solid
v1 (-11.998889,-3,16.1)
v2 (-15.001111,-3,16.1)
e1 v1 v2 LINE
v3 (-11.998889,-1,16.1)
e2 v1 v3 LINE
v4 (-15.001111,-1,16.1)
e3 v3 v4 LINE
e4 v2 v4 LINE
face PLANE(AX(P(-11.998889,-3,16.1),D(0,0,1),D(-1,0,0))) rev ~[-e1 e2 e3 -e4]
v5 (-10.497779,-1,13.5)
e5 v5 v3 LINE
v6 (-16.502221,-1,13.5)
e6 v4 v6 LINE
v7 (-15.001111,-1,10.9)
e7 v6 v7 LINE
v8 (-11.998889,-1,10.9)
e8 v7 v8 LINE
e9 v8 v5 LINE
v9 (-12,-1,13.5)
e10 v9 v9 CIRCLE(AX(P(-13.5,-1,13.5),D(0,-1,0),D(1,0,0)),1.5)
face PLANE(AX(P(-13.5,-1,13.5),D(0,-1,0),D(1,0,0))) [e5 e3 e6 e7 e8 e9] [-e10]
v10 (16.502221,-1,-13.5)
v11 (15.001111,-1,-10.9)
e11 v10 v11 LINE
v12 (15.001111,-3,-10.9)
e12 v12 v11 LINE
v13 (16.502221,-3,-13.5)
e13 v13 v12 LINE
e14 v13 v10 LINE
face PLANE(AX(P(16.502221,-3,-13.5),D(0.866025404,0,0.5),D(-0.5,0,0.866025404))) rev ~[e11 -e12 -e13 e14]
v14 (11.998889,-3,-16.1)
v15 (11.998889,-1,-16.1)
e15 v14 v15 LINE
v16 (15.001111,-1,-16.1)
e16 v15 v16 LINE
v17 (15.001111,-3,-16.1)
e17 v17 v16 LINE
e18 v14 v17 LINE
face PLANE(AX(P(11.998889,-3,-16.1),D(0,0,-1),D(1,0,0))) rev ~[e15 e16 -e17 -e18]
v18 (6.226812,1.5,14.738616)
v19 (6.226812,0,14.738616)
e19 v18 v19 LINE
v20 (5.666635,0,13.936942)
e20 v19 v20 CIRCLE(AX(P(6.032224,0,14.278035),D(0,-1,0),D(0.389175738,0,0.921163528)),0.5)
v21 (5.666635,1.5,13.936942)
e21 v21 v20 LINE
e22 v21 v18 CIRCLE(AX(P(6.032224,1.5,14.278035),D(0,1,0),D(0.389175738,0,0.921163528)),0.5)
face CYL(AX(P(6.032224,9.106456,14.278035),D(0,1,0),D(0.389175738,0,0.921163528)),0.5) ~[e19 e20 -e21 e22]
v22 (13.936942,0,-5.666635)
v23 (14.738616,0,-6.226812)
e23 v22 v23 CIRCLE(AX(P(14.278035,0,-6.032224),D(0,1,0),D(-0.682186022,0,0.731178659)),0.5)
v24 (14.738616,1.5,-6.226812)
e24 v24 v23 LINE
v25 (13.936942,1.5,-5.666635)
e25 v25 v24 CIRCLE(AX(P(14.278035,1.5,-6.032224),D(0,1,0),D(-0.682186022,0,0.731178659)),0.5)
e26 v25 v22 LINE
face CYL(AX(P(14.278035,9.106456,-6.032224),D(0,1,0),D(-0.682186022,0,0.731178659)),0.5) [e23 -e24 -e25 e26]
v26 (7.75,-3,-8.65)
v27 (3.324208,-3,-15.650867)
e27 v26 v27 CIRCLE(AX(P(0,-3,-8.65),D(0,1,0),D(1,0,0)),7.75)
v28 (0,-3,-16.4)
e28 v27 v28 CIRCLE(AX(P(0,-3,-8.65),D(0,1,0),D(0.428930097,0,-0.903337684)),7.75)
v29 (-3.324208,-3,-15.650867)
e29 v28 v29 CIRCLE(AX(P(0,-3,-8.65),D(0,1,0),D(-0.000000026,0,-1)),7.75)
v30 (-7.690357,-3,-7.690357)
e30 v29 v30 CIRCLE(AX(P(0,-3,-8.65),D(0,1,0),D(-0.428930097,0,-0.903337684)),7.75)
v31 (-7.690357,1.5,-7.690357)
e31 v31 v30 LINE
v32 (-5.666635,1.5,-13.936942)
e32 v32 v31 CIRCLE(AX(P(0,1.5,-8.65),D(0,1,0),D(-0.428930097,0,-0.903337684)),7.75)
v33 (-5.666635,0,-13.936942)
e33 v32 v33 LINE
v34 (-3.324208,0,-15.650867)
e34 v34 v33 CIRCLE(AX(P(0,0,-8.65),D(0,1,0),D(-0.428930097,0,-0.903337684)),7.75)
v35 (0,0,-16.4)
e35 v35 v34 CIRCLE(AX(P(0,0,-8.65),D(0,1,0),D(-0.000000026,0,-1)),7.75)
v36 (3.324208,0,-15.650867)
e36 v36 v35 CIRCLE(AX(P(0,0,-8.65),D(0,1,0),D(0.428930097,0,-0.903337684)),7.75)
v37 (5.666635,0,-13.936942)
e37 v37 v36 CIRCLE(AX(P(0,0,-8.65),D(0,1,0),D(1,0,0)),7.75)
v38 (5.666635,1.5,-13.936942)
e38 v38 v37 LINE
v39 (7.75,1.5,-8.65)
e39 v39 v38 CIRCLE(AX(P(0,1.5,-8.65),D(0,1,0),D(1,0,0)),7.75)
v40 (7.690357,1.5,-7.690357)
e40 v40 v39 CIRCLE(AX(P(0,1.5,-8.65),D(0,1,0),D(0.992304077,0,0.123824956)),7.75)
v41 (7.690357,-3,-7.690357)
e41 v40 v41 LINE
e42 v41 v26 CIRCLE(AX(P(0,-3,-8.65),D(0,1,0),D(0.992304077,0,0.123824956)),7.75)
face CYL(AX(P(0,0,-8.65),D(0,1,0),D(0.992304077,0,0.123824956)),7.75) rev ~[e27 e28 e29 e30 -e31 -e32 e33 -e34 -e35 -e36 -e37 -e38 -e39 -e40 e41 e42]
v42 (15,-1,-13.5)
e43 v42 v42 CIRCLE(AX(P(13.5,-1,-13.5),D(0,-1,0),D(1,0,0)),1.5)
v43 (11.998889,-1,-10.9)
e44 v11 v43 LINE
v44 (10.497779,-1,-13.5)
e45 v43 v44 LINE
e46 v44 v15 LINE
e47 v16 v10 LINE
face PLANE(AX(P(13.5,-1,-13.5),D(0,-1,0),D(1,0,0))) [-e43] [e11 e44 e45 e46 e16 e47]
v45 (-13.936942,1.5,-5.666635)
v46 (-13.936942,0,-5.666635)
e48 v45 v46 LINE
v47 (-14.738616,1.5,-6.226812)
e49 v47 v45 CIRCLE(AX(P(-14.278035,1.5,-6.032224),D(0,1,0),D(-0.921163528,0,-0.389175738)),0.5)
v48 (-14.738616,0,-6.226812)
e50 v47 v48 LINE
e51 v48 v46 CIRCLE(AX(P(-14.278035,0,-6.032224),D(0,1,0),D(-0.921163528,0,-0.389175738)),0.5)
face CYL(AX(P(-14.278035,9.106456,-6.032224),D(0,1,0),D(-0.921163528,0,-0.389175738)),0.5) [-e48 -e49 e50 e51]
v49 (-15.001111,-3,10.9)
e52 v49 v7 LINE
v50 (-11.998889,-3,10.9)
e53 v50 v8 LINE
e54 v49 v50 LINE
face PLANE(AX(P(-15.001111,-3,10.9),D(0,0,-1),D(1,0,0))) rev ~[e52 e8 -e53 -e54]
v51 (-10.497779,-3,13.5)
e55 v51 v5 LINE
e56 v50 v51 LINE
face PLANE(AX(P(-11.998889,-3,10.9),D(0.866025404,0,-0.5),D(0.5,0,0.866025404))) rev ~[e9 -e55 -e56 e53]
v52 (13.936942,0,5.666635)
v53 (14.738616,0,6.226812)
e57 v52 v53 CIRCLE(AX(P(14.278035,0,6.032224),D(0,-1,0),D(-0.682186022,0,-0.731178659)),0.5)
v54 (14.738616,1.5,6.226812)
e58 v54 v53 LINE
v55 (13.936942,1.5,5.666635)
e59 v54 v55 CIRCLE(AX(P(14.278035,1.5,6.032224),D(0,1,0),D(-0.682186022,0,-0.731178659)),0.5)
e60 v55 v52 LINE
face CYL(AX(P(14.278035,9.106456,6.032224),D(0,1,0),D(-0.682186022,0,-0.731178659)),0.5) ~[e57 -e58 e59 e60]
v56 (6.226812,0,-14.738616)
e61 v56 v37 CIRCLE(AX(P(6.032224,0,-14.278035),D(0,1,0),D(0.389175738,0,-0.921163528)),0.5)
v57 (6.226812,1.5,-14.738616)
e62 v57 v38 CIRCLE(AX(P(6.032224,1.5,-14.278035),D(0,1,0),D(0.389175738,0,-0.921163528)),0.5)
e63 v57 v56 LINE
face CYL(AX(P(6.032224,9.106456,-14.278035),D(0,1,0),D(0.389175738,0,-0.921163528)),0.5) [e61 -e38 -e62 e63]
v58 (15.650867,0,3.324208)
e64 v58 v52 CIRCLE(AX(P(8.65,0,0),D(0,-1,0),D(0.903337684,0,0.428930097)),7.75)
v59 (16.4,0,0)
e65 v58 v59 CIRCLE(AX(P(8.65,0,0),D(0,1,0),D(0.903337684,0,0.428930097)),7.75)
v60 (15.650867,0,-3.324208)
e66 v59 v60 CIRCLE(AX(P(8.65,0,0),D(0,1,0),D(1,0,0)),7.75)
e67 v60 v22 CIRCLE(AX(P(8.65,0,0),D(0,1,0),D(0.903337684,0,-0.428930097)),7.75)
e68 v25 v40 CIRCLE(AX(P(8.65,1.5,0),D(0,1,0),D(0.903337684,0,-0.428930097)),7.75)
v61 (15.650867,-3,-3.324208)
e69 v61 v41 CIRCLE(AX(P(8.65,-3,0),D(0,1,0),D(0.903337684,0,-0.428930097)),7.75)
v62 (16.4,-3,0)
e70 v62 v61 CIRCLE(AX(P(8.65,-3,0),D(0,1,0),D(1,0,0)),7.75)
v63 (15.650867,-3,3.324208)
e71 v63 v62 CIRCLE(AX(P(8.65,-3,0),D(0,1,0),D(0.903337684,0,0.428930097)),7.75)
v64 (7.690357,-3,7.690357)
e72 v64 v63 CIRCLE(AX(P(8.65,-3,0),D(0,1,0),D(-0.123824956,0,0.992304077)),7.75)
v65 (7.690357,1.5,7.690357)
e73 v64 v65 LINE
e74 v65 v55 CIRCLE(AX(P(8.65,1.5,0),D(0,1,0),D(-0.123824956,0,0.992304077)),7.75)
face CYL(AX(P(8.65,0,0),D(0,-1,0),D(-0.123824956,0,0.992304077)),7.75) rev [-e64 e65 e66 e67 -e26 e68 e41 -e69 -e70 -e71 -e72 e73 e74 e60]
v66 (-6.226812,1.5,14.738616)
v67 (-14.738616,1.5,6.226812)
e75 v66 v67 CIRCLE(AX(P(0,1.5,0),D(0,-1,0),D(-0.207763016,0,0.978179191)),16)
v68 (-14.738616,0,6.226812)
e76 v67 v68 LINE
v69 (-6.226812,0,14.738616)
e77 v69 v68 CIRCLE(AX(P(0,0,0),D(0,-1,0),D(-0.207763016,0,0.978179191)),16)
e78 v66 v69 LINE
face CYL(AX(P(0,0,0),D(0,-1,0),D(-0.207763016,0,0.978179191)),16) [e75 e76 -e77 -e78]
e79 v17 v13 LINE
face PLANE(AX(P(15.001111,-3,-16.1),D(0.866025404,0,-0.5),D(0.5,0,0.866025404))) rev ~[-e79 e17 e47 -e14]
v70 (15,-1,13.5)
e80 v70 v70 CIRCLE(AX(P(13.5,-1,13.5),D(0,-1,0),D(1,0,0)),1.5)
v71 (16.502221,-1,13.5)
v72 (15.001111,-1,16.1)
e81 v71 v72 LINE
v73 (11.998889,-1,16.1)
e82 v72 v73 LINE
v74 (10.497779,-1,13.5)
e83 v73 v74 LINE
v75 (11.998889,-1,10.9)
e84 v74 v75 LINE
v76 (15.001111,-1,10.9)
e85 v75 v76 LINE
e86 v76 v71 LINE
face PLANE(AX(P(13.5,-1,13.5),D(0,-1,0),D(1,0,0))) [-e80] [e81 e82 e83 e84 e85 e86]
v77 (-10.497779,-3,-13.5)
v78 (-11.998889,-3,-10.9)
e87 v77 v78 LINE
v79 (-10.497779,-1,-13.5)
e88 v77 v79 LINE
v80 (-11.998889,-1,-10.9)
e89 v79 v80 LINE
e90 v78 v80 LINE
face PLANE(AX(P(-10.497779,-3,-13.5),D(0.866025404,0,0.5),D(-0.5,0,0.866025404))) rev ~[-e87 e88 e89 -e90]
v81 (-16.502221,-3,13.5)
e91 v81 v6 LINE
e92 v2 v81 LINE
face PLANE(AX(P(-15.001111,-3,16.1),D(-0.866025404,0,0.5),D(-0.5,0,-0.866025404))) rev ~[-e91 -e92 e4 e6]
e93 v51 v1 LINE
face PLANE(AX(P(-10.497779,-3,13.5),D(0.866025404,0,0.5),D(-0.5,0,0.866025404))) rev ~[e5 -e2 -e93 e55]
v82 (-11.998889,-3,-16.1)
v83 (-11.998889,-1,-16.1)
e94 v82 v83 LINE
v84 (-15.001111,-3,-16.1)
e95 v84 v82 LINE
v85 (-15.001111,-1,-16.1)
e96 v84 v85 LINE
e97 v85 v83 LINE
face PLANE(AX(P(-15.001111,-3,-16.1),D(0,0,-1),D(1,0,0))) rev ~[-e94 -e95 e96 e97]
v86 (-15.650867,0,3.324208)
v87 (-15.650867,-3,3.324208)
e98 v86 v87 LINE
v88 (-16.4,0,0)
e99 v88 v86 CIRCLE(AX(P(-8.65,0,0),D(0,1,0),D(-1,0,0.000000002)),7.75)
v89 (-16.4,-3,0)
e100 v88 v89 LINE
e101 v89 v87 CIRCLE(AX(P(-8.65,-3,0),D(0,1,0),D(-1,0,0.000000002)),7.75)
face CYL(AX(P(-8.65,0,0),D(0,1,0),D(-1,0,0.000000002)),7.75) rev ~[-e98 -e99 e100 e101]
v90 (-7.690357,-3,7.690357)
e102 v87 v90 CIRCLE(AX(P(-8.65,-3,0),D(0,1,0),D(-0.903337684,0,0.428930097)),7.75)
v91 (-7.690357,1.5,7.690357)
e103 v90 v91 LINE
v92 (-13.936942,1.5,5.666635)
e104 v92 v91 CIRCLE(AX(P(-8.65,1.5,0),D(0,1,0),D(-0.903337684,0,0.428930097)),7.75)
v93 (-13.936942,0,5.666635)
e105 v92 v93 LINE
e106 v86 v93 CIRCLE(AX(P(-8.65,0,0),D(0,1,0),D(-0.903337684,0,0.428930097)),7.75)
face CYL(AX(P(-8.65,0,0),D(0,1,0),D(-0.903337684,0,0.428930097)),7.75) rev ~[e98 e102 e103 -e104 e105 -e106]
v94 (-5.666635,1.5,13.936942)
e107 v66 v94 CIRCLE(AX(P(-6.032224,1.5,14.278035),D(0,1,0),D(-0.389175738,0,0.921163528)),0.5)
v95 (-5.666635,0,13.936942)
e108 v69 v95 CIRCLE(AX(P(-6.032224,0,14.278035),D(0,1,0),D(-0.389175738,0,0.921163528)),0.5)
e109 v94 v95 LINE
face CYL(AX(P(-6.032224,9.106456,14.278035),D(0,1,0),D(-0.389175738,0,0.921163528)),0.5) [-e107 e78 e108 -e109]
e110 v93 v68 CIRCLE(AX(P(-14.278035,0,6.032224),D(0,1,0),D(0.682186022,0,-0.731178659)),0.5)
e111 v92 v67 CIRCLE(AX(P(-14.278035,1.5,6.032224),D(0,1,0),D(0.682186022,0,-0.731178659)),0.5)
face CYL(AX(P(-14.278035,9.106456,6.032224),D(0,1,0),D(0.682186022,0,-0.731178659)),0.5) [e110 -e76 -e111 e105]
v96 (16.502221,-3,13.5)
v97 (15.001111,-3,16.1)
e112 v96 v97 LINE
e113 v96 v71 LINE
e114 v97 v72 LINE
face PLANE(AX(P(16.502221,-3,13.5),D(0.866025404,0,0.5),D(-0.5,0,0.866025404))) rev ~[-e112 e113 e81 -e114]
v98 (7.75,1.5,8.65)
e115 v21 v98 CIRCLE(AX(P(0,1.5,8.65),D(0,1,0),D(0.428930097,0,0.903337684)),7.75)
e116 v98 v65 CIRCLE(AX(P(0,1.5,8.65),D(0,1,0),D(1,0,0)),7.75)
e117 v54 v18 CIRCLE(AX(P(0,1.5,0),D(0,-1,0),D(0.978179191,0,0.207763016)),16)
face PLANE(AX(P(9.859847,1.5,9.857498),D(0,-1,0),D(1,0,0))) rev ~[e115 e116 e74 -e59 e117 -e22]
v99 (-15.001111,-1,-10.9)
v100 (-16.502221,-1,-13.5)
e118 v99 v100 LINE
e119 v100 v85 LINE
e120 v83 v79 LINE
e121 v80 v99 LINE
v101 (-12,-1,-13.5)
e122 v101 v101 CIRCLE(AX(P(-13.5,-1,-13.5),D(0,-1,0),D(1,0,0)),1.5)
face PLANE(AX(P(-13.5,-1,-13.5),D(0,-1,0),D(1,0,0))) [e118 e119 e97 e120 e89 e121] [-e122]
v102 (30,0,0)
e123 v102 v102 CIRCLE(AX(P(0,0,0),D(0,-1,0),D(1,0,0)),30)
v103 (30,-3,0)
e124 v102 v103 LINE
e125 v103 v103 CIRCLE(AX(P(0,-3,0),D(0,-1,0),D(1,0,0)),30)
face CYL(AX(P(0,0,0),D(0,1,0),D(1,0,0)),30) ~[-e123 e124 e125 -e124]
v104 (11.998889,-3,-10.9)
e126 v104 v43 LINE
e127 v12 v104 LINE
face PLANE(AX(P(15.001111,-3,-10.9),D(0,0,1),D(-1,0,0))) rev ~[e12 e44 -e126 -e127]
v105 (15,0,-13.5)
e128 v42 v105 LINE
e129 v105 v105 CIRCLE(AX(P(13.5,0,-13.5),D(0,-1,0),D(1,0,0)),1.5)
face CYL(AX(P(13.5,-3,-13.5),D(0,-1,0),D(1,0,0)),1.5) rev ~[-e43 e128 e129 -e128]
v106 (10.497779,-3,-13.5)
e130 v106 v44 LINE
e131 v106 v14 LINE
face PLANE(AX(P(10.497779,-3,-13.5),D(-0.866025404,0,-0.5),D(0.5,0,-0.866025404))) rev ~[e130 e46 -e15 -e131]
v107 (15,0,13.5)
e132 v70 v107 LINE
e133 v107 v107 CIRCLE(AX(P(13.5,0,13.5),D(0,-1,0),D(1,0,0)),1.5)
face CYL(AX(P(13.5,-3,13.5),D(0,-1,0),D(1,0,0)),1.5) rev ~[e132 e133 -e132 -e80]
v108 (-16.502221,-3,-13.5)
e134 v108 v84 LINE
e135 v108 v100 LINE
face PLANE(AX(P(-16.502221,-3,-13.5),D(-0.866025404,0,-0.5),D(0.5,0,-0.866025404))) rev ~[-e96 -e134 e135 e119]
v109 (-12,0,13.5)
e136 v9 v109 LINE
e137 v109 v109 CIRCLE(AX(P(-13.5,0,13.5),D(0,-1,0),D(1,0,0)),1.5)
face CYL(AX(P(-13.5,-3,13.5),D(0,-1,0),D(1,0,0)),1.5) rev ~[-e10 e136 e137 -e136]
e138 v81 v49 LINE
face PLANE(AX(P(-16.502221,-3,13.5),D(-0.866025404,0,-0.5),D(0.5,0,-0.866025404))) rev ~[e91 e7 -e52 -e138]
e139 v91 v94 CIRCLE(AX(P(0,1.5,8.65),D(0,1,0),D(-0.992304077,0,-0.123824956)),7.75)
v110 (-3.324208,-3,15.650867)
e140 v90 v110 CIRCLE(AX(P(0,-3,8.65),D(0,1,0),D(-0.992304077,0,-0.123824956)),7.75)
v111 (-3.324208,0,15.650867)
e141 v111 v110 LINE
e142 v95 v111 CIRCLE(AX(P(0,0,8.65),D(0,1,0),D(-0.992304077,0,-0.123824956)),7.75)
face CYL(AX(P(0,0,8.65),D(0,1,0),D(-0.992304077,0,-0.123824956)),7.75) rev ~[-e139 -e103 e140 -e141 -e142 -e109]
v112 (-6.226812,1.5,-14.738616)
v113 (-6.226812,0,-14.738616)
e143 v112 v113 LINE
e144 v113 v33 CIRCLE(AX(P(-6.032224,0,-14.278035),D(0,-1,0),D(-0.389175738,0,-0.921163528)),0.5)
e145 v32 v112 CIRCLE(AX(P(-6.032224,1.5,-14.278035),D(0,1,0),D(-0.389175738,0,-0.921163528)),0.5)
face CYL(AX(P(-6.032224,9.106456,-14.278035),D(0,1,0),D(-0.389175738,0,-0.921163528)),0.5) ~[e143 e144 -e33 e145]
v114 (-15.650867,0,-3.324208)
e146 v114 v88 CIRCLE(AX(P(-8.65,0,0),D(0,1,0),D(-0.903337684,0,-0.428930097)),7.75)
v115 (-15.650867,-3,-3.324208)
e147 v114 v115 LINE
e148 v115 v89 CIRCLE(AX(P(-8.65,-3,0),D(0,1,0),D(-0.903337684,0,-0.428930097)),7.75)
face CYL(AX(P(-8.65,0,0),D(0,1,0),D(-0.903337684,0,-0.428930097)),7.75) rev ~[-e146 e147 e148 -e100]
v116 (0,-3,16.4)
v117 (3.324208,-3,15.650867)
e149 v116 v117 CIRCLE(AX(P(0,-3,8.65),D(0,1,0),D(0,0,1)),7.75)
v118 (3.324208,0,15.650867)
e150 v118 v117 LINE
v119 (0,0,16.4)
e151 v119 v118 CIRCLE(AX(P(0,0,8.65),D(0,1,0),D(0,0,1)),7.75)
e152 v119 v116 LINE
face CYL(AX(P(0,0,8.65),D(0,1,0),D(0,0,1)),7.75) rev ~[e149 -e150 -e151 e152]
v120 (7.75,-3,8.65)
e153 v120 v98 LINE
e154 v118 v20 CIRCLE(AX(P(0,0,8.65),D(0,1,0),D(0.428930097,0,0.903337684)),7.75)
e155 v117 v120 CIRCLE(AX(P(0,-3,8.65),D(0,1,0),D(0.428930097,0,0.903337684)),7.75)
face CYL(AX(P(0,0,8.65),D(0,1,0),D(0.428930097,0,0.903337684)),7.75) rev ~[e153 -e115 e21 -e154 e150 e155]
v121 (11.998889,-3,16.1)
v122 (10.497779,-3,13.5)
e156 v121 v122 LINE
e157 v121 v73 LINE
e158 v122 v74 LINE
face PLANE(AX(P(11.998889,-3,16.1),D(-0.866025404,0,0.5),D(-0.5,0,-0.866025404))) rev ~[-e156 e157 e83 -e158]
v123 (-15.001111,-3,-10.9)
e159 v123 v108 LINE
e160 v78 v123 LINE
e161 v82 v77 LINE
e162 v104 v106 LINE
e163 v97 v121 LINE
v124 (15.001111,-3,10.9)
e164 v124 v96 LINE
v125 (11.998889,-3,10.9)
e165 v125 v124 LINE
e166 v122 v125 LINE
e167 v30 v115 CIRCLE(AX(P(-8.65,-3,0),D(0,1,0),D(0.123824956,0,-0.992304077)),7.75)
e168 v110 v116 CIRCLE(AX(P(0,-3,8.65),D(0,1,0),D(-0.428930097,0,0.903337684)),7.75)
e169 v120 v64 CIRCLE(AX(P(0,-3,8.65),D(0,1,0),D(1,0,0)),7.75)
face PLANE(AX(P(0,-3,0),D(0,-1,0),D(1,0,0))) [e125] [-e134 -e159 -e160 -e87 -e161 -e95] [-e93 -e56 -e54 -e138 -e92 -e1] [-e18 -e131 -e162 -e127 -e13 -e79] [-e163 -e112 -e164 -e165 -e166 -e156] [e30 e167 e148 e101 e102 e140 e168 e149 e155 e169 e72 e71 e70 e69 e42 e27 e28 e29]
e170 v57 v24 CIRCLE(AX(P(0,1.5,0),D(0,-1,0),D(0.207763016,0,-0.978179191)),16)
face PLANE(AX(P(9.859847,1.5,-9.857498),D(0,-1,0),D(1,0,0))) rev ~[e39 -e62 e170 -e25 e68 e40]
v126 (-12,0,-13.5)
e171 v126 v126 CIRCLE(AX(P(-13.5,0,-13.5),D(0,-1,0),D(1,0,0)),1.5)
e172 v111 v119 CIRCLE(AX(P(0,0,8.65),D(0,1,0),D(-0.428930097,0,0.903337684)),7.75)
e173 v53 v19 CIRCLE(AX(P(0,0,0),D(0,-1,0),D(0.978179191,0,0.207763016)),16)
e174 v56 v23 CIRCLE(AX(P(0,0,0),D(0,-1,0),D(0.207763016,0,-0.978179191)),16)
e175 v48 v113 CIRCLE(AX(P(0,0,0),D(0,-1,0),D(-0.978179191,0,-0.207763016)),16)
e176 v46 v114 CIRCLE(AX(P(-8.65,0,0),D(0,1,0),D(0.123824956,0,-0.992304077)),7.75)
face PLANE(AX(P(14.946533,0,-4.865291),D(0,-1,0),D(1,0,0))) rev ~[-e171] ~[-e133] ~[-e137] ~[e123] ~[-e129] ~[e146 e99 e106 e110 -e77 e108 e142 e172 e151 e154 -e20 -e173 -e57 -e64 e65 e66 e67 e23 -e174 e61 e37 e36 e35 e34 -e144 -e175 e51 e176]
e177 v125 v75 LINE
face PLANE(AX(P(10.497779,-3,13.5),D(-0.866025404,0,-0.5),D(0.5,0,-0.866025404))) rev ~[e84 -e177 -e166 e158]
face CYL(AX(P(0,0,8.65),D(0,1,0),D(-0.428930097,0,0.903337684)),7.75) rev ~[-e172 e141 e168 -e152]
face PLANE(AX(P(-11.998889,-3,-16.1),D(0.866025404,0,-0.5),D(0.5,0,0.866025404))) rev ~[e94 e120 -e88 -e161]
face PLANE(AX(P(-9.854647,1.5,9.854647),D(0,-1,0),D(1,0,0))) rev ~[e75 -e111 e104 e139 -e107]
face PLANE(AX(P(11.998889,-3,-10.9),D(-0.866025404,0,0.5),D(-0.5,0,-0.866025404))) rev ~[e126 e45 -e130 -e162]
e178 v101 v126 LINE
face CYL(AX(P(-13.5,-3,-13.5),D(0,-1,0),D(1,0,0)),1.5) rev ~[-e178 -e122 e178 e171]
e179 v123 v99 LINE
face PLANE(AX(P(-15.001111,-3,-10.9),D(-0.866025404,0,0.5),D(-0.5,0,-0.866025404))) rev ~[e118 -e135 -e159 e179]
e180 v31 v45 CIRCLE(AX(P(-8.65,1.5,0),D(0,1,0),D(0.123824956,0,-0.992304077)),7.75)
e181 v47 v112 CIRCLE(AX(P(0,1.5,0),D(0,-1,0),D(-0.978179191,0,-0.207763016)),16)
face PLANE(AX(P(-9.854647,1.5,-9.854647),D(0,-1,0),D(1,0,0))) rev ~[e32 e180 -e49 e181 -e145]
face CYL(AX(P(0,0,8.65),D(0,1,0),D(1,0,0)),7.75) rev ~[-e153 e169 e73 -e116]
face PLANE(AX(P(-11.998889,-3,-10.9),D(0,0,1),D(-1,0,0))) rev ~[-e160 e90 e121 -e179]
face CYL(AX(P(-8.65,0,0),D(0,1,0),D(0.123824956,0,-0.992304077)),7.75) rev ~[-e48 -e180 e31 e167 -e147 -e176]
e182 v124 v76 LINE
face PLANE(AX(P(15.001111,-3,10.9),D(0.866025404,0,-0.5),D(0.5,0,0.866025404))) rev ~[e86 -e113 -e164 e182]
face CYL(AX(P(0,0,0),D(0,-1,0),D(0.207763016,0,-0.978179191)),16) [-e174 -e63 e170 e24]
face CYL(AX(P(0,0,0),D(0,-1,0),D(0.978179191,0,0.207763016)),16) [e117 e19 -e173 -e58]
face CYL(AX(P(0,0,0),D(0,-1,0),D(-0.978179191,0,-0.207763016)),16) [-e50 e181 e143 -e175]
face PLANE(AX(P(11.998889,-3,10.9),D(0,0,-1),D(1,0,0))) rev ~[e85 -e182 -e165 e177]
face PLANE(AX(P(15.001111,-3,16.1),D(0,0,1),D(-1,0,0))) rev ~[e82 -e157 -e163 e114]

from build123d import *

# Parameters (mm, degrees)
F0_R        = 30
F1_DEPTH    = 3
F4_DEPTH    = 1.5
F5_T1_DEPTH = 9.1064563612
F2_R        = 1.5
F3_DEPTH    = 2
F6_DEPTH    = 25


# Not quite as in the source:
# - a fillet or chamfer that OpenCascade refuses, or shapes differently, is made with other operations: its cross-section is extruded or revolved along the edge and cut away or added


with BuildPart() as f1:
    # F0 (on Front) → F1 (new body)
    with BuildSketch(Plane.XZ):
        Circle(F0_R)
        with BuildLine():
            ThreePointArc((0, 16.4), (11.5965512115, 11.5965512115), (16.4, 0))
            ThreePointArc((16.4, 0), (11.5965511405, -11.5965512824), (-2.007e-07, -16.4))
            ThreePointArc((-2.007e-07, -16.4), (-11.5965512889, -11.596551134), (-16.4, 1.83e-08))
            ThreePointArc((-16.4, 1.83e-08), (-11.596551205, 11.5965512179), (0, 16.4))
        make_face(mode=Mode.SUBTRACT)
        with BuildLine():
            ThreePointArc((7.6903565933, 7.6903565933), (12.3769167702, 6.7950416767), (15.650867052, 3.3242082546))
            ThreePointArc((15.650867052, 3.3242082546), (11.313708499, 11.313708499), (3.3242082546, 15.650867052))
            ThreePointArc((3.3242082546, 15.650867052), (6.5507676639, 12.7912489678), (7.75, 8.65))
            ThreePointArc((7.75, 8.65), (7.7350747766, 8.1692524561), (7.6903565933, 7.6903565933))
        make_face()
        with BuildLine():
            ThreePointArc((3.3242082546, -15.650867052), (11.313708499, -11.313708499), (15.650867052, -3.3242082546))
            ThreePointArc((15.650867052, -3.3242082546), (12.3769167702, -6.7950416767), (7.6903565933, -7.6903565933))
            ThreePointArc((7.6903565933, -7.6903565933), (7.7350747766, -8.1692524561), (7.75, -8.65))
            ThreePointArc((7.75, -8.65), (6.5507676639, -12.7912489678), (3.3242082546, -15.650867052))
        make_face()
        with BuildLine():
            ThreePointArc((-7.6903565933, 7.6903565933), (-6.7950416767, 12.3769167702), (-3.3242082546, 15.650867052))
            ThreePointArc((-3.3242082546, 15.650867052), (-11.313708499, 11.313708499), (-15.650867052, 3.3242082546))
            ThreePointArc((-15.650867052, 3.3242082546), (-12.3769167702, 6.7950416767), (-7.6903565933, 7.6903565933))
        make_face()
        with BuildLine():
            ThreePointArc((-15.650867052, -3.3242082546), (-11.313708499, -11.313708499), (-3.3242082546, -15.650867052))
            ThreePointArc((-3.3242082546, -15.650867052), (-6.7950416767, -12.3769167702), (-7.6903565933, -7.6903565933))
            ThreePointArc((-7.6903565933, -7.6903565933), (-12.3769167702, -6.7950416767), (-15.650867052, -3.3242082546))
        make_face()
        with BuildLine():
            ThreePointArc((15.650867052, 3.3242082546), (16.2103974649, 1.7037870094), (16.4, 0))
            ThreePointArc((16.4, 0), (11.5965512115, 11.5965512115), (0, 16.4))
            ThreePointArc((0, 16.4), (1.7037870094, 16.2103974649), (3.3242082546, 15.650867052))
            ThreePointArc((3.3242082546, 15.650867052), (11.313708499, 11.313708499), (15.650867052, 3.3242082546))
        make_face()
        with BuildLine():
            ThreePointArc((-2.007e-07, -16.4), (11.5965511405, -11.5965512824), (16.4, 0))
            ThreePointArc((16.4, 0), (16.2103974649, -1.7037870094), (15.650867052, -3.3242082546))
            ThreePointArc((15.650867052, -3.3242082546), (11.313708499, -11.313708499), (3.3242082546, -15.650867052))
            ThreePointArc((3.3242082546, -15.650867052), (1.7037869115, -16.2103974869), (-2.007e-07, -16.4))
        make_face()
        with BuildLine():
            ThreePointArc((-3.3242082546, 15.650867052), (-1.7037870094, 16.2103974649), (0, 16.4))
            ThreePointArc((0, 16.4), (-11.596551205, 11.5965512179), (-16.4, 1.83e-08))
            ThreePointArc((-16.4, 1.83e-08), (-16.2103974628, 1.7037870183), (-15.650867052, 3.3242082546))
            ThreePointArc((-15.650867052, 3.3242082546), (-11.313708499, 11.313708499), (-3.3242082546, 15.650867052))
        make_face()
        with BuildLine():
            ThreePointArc((-16.4, 1.83e-08), (-11.5965512889, -11.596551134), (-2.007e-07, -16.4))
            ThreePointArc((-2.007e-07, -16.4), (-1.7037871073, -16.2103974428), (-3.3242082546, -15.650867052))
            ThreePointArc((-3.3242082546, -15.650867052), (-11.313708499, -11.313708499), (-15.650867052, -3.3242082546))
            ThreePointArc((-15.650867052, -3.3242082546), (-16.2103974669, -1.7037870005), (-16.4, 1.83e-08))
        make_face()
    extrude(amount=F1_DEPTH)

    # F0 (on Front) → F4 (join)
    with BuildSketch(Plane.XZ):
        with BuildLine():
            ThreePointArc((7.6903565933, 7.6903565933), (12.3769167702, 6.7950416767), (15.650867052, 3.3242082546))
            ThreePointArc((15.650867052, 3.3242082546), (11.313708499, 11.313708499), (3.3242082546, 15.650867052))
            ThreePointArc((3.3242082546, 15.650867052), (6.5507676639, 12.7912489678), (7.75, 8.65))
            ThreePointArc((7.75, 8.65), (7.7350747766, 8.1692524561), (7.6903565933, 7.6903565933))
        make_face()
        with BuildLine():
            ThreePointArc((3.3242082546, -15.650867052), (11.313708499, -11.313708499), (15.650867052, -3.3242082546))
            ThreePointArc((15.650867052, -3.3242082546), (12.3769167702, -6.7950416767), (7.6903565933, -7.6903565933))
            ThreePointArc((7.6903565933, -7.6903565933), (7.7350747766, -8.1692524561), (7.75, -8.65))
            ThreePointArc((7.75, -8.65), (6.5507676639, -12.7912489678), (3.3242082546, -15.650867052))
        make_face()
        with BuildLine():
            ThreePointArc((-7.6903565933, 7.6903565933), (-6.7950416767, 12.3769167702), (-3.3242082546, 15.650867052))
            ThreePointArc((-3.3242082546, 15.650867052), (-11.313708499, 11.313708499), (-15.650867052, 3.3242082546))
            ThreePointArc((-15.650867052, 3.3242082546), (-12.3769167702, 6.7950416767), (-7.6903565933, 7.6903565933))
        make_face()
        with BuildLine():
            ThreePointArc((-15.650867052, -3.3242082546), (-11.313708499, -11.313708499), (-3.3242082546, -15.650867052))
            ThreePointArc((-3.3242082546, -15.650867052), (-6.7950416767, -12.3769167702), (-7.6903565933, -7.6903565933))
            ThreePointArc((-7.6903565933, -7.6903565933), (-12.3769167702, -6.7950416767), (-15.650867052, -3.3242082546))
        make_face()
    extrude(amount=-F4_DEPTH)

    # F5: fillet of radius 0.5 on 8 edges, made by hand

    # F5_s2 → F5_t1 (cut)
    with BuildSketch(Plane.XZ.offset(-9.1064563612)):
        with BuildLine():
            ThreePointArc((-6.2268118052, -14.738616446), (-5.6223691009, -14.5644243012), (-5.6666346068, -13.936941671))
            ThreePointArc((-5.6666346068, -13.936941671), (-4.5763739896, -14.9045424379), (-3.3242082546, -15.650867052))
            ThreePointArc((-3.3242082546, -15.650867052), (-4.7972436187, -15.263893791), (-6.2268118052, -14.738616446))
        make_face()
        with BuildLine():
            ThreePointArc((6.2268118052, -14.738616446), (5.6223691009, -14.5644243012), (5.6666346068, -13.936941671))
            ThreePointArc((5.6666346068, -13.936941671), (4.5763739896, -14.9045424379), (3.3242082546, -15.650867052))
            ThreePointArc((3.3242082546, -15.650867052), (4.7972436187, -15.263893791), (6.2268118052, -14.738616446))
        make_face()
        with BuildLine():
            ThreePointArc((13.936941671, 5.6666346068), (14.5644243012, 5.6223691009), (14.738616446, 6.2268118052))
            ThreePointArc((14.738616446, 6.2268118052), (15.263893791, 4.7972436187), (15.650867052, 3.3242082546))
            ThreePointArc((15.650867052, 3.3242082546), (14.9045424379, 4.5763739896), (13.936941671, 5.6666346068))
        make_face()
        with BuildLine():
            ThreePointArc((13.936941671, -5.6666346068), (14.5644243012, -5.6223691009), (14.738616446, -6.2268118052))
            ThreePointArc((14.738616446, -6.2268118052), (15.263893791, -4.7972436187), (15.650867052, -3.3242082546))
            ThreePointArc((15.650867052, -3.3242082546), (14.9045424379, -4.5763739896), (13.936941671, -5.6666346068))
        make_face()
        with BuildLine():
            ThreePointArc((-13.936941671, 5.6666346068), (-14.5644243012, 5.6223691009), (-14.738616446, 6.2268118052))
            ThreePointArc((-14.738616446, 6.2268118052), (-15.263893791, 4.7972436187), (-15.650867052, 3.3242082546))
            ThreePointArc((-15.650867052, 3.3242082546), (-14.9045424379, 4.5763739896), (-13.936941671, 5.6666346068))
        make_face()
        with BuildLine():
            ThreePointArc((-14.738616446, -6.2268118052), (-14.5644243012, -5.6223691009), (-13.936941671, -5.6666346068))
            ThreePointArc((-13.936941671, -5.6666346068), (-14.9045424379, -4.5763739896), (-15.650867052, -3.3242082546))
            ThreePointArc((-15.650867052, -3.3242082546), (-15.263893791, -4.7972436187), (-14.738616446, -6.2268118052))
        make_face()
        with BuildLine():
            ThreePointArc((6.2268118052, 14.738616446), (5.6223691009, 14.5644243012), (5.6666346068, 13.936941671))
            ThreePointArc((5.6666346068, 13.936941671), (4.5763739896, 14.9045424379), (3.3242082546, 15.650867052))
            ThreePointArc((3.3242082546, 15.650867052), (4.7972436187, 15.263893791), (6.2268118052, 14.738616446))
        make_face()
        with BuildLine():
            ThreePointArc((-6.2268118052, 14.738616446), (-5.6223691009, 14.5644243012), (-5.6666346068, 13.936941671))
            ThreePointArc((-5.6666346068, 13.936941671), (-4.5763739896, 14.9045424379), (-3.3242082546, 15.650867052))
            ThreePointArc((-3.3242082546, 15.650867052), (-4.7972436187, 15.263893791), (-6.2268118052, 14.738616446))
        make_face()
    extrude(amount=F5_T1_DEPTH, mode=Mode.SUBTRACT)

    # F2 (on face) → F3 (cut)
    with BuildSketch(Plane.XZ.offset(3)):
        Polygon((-15.0011106999, 10.9), (-11.9988893001, 10.9), (-10.4977786002, 13.5), (-11.9988893001, 16.1), (-15.0011106999, 16.1), (-16.5022213998, 13.5), align=None)
        with Locations((-13.5, 13.5)):
            Circle(F2_R, mode=Mode.SUBTRACT)
        Polygon((11.9988893001, 10.9), (15.0011106999, 10.9), (16.5022213998, 13.5), (15.0011106999, 16.1), (11.9988893001, 16.1), (10.4977786002, 13.5), align=None)
        with Locations((13.5, 13.5)):
            Circle(F2_R, mode=Mode.SUBTRACT)
        Polygon((-11.9988893001, -10.9), (-15.0011106999, -10.9), (-16.5022213998, -13.5), (-15.0011106999, -16.1), (-11.9988893001, -16.1), (-10.4977786002, -13.5), align=None)
        with Locations((-13.5, -13.5)):
            Circle(F2_R, mode=Mode.SUBTRACT)
        Polygon((15.0011106999, -10.9), (11.9988893001, -10.9), (10.4977786002, -13.5), (11.9988893001, -16.1), (15.0011106999, -16.1), (16.5022213998, -13.5), align=None)
        with Locations((13.5, -13.5)):
            Circle(F2_R, mode=Mode.SUBTRACT)
    extrude(amount=-F3_DEPTH, mode=Mode.SUBTRACT)

    # F2 (on face) → F6 (cut)
    with BuildSketch(Plane.XZ.offset(3)):
        with Locations((-13.5, 13.5)):
            Circle(F2_R)
        with Locations((13.5, 13.5)):
            Circle(F2_R)
        with Locations((13.5, -13.5)):
            Circle(F2_R)
        with Locations((-13.5, -13.5)):
            Circle(F2_R)
    extrude(amount=-F6_DEPTH, mode=Mode.SUBTRACT)


solid = f1.part
